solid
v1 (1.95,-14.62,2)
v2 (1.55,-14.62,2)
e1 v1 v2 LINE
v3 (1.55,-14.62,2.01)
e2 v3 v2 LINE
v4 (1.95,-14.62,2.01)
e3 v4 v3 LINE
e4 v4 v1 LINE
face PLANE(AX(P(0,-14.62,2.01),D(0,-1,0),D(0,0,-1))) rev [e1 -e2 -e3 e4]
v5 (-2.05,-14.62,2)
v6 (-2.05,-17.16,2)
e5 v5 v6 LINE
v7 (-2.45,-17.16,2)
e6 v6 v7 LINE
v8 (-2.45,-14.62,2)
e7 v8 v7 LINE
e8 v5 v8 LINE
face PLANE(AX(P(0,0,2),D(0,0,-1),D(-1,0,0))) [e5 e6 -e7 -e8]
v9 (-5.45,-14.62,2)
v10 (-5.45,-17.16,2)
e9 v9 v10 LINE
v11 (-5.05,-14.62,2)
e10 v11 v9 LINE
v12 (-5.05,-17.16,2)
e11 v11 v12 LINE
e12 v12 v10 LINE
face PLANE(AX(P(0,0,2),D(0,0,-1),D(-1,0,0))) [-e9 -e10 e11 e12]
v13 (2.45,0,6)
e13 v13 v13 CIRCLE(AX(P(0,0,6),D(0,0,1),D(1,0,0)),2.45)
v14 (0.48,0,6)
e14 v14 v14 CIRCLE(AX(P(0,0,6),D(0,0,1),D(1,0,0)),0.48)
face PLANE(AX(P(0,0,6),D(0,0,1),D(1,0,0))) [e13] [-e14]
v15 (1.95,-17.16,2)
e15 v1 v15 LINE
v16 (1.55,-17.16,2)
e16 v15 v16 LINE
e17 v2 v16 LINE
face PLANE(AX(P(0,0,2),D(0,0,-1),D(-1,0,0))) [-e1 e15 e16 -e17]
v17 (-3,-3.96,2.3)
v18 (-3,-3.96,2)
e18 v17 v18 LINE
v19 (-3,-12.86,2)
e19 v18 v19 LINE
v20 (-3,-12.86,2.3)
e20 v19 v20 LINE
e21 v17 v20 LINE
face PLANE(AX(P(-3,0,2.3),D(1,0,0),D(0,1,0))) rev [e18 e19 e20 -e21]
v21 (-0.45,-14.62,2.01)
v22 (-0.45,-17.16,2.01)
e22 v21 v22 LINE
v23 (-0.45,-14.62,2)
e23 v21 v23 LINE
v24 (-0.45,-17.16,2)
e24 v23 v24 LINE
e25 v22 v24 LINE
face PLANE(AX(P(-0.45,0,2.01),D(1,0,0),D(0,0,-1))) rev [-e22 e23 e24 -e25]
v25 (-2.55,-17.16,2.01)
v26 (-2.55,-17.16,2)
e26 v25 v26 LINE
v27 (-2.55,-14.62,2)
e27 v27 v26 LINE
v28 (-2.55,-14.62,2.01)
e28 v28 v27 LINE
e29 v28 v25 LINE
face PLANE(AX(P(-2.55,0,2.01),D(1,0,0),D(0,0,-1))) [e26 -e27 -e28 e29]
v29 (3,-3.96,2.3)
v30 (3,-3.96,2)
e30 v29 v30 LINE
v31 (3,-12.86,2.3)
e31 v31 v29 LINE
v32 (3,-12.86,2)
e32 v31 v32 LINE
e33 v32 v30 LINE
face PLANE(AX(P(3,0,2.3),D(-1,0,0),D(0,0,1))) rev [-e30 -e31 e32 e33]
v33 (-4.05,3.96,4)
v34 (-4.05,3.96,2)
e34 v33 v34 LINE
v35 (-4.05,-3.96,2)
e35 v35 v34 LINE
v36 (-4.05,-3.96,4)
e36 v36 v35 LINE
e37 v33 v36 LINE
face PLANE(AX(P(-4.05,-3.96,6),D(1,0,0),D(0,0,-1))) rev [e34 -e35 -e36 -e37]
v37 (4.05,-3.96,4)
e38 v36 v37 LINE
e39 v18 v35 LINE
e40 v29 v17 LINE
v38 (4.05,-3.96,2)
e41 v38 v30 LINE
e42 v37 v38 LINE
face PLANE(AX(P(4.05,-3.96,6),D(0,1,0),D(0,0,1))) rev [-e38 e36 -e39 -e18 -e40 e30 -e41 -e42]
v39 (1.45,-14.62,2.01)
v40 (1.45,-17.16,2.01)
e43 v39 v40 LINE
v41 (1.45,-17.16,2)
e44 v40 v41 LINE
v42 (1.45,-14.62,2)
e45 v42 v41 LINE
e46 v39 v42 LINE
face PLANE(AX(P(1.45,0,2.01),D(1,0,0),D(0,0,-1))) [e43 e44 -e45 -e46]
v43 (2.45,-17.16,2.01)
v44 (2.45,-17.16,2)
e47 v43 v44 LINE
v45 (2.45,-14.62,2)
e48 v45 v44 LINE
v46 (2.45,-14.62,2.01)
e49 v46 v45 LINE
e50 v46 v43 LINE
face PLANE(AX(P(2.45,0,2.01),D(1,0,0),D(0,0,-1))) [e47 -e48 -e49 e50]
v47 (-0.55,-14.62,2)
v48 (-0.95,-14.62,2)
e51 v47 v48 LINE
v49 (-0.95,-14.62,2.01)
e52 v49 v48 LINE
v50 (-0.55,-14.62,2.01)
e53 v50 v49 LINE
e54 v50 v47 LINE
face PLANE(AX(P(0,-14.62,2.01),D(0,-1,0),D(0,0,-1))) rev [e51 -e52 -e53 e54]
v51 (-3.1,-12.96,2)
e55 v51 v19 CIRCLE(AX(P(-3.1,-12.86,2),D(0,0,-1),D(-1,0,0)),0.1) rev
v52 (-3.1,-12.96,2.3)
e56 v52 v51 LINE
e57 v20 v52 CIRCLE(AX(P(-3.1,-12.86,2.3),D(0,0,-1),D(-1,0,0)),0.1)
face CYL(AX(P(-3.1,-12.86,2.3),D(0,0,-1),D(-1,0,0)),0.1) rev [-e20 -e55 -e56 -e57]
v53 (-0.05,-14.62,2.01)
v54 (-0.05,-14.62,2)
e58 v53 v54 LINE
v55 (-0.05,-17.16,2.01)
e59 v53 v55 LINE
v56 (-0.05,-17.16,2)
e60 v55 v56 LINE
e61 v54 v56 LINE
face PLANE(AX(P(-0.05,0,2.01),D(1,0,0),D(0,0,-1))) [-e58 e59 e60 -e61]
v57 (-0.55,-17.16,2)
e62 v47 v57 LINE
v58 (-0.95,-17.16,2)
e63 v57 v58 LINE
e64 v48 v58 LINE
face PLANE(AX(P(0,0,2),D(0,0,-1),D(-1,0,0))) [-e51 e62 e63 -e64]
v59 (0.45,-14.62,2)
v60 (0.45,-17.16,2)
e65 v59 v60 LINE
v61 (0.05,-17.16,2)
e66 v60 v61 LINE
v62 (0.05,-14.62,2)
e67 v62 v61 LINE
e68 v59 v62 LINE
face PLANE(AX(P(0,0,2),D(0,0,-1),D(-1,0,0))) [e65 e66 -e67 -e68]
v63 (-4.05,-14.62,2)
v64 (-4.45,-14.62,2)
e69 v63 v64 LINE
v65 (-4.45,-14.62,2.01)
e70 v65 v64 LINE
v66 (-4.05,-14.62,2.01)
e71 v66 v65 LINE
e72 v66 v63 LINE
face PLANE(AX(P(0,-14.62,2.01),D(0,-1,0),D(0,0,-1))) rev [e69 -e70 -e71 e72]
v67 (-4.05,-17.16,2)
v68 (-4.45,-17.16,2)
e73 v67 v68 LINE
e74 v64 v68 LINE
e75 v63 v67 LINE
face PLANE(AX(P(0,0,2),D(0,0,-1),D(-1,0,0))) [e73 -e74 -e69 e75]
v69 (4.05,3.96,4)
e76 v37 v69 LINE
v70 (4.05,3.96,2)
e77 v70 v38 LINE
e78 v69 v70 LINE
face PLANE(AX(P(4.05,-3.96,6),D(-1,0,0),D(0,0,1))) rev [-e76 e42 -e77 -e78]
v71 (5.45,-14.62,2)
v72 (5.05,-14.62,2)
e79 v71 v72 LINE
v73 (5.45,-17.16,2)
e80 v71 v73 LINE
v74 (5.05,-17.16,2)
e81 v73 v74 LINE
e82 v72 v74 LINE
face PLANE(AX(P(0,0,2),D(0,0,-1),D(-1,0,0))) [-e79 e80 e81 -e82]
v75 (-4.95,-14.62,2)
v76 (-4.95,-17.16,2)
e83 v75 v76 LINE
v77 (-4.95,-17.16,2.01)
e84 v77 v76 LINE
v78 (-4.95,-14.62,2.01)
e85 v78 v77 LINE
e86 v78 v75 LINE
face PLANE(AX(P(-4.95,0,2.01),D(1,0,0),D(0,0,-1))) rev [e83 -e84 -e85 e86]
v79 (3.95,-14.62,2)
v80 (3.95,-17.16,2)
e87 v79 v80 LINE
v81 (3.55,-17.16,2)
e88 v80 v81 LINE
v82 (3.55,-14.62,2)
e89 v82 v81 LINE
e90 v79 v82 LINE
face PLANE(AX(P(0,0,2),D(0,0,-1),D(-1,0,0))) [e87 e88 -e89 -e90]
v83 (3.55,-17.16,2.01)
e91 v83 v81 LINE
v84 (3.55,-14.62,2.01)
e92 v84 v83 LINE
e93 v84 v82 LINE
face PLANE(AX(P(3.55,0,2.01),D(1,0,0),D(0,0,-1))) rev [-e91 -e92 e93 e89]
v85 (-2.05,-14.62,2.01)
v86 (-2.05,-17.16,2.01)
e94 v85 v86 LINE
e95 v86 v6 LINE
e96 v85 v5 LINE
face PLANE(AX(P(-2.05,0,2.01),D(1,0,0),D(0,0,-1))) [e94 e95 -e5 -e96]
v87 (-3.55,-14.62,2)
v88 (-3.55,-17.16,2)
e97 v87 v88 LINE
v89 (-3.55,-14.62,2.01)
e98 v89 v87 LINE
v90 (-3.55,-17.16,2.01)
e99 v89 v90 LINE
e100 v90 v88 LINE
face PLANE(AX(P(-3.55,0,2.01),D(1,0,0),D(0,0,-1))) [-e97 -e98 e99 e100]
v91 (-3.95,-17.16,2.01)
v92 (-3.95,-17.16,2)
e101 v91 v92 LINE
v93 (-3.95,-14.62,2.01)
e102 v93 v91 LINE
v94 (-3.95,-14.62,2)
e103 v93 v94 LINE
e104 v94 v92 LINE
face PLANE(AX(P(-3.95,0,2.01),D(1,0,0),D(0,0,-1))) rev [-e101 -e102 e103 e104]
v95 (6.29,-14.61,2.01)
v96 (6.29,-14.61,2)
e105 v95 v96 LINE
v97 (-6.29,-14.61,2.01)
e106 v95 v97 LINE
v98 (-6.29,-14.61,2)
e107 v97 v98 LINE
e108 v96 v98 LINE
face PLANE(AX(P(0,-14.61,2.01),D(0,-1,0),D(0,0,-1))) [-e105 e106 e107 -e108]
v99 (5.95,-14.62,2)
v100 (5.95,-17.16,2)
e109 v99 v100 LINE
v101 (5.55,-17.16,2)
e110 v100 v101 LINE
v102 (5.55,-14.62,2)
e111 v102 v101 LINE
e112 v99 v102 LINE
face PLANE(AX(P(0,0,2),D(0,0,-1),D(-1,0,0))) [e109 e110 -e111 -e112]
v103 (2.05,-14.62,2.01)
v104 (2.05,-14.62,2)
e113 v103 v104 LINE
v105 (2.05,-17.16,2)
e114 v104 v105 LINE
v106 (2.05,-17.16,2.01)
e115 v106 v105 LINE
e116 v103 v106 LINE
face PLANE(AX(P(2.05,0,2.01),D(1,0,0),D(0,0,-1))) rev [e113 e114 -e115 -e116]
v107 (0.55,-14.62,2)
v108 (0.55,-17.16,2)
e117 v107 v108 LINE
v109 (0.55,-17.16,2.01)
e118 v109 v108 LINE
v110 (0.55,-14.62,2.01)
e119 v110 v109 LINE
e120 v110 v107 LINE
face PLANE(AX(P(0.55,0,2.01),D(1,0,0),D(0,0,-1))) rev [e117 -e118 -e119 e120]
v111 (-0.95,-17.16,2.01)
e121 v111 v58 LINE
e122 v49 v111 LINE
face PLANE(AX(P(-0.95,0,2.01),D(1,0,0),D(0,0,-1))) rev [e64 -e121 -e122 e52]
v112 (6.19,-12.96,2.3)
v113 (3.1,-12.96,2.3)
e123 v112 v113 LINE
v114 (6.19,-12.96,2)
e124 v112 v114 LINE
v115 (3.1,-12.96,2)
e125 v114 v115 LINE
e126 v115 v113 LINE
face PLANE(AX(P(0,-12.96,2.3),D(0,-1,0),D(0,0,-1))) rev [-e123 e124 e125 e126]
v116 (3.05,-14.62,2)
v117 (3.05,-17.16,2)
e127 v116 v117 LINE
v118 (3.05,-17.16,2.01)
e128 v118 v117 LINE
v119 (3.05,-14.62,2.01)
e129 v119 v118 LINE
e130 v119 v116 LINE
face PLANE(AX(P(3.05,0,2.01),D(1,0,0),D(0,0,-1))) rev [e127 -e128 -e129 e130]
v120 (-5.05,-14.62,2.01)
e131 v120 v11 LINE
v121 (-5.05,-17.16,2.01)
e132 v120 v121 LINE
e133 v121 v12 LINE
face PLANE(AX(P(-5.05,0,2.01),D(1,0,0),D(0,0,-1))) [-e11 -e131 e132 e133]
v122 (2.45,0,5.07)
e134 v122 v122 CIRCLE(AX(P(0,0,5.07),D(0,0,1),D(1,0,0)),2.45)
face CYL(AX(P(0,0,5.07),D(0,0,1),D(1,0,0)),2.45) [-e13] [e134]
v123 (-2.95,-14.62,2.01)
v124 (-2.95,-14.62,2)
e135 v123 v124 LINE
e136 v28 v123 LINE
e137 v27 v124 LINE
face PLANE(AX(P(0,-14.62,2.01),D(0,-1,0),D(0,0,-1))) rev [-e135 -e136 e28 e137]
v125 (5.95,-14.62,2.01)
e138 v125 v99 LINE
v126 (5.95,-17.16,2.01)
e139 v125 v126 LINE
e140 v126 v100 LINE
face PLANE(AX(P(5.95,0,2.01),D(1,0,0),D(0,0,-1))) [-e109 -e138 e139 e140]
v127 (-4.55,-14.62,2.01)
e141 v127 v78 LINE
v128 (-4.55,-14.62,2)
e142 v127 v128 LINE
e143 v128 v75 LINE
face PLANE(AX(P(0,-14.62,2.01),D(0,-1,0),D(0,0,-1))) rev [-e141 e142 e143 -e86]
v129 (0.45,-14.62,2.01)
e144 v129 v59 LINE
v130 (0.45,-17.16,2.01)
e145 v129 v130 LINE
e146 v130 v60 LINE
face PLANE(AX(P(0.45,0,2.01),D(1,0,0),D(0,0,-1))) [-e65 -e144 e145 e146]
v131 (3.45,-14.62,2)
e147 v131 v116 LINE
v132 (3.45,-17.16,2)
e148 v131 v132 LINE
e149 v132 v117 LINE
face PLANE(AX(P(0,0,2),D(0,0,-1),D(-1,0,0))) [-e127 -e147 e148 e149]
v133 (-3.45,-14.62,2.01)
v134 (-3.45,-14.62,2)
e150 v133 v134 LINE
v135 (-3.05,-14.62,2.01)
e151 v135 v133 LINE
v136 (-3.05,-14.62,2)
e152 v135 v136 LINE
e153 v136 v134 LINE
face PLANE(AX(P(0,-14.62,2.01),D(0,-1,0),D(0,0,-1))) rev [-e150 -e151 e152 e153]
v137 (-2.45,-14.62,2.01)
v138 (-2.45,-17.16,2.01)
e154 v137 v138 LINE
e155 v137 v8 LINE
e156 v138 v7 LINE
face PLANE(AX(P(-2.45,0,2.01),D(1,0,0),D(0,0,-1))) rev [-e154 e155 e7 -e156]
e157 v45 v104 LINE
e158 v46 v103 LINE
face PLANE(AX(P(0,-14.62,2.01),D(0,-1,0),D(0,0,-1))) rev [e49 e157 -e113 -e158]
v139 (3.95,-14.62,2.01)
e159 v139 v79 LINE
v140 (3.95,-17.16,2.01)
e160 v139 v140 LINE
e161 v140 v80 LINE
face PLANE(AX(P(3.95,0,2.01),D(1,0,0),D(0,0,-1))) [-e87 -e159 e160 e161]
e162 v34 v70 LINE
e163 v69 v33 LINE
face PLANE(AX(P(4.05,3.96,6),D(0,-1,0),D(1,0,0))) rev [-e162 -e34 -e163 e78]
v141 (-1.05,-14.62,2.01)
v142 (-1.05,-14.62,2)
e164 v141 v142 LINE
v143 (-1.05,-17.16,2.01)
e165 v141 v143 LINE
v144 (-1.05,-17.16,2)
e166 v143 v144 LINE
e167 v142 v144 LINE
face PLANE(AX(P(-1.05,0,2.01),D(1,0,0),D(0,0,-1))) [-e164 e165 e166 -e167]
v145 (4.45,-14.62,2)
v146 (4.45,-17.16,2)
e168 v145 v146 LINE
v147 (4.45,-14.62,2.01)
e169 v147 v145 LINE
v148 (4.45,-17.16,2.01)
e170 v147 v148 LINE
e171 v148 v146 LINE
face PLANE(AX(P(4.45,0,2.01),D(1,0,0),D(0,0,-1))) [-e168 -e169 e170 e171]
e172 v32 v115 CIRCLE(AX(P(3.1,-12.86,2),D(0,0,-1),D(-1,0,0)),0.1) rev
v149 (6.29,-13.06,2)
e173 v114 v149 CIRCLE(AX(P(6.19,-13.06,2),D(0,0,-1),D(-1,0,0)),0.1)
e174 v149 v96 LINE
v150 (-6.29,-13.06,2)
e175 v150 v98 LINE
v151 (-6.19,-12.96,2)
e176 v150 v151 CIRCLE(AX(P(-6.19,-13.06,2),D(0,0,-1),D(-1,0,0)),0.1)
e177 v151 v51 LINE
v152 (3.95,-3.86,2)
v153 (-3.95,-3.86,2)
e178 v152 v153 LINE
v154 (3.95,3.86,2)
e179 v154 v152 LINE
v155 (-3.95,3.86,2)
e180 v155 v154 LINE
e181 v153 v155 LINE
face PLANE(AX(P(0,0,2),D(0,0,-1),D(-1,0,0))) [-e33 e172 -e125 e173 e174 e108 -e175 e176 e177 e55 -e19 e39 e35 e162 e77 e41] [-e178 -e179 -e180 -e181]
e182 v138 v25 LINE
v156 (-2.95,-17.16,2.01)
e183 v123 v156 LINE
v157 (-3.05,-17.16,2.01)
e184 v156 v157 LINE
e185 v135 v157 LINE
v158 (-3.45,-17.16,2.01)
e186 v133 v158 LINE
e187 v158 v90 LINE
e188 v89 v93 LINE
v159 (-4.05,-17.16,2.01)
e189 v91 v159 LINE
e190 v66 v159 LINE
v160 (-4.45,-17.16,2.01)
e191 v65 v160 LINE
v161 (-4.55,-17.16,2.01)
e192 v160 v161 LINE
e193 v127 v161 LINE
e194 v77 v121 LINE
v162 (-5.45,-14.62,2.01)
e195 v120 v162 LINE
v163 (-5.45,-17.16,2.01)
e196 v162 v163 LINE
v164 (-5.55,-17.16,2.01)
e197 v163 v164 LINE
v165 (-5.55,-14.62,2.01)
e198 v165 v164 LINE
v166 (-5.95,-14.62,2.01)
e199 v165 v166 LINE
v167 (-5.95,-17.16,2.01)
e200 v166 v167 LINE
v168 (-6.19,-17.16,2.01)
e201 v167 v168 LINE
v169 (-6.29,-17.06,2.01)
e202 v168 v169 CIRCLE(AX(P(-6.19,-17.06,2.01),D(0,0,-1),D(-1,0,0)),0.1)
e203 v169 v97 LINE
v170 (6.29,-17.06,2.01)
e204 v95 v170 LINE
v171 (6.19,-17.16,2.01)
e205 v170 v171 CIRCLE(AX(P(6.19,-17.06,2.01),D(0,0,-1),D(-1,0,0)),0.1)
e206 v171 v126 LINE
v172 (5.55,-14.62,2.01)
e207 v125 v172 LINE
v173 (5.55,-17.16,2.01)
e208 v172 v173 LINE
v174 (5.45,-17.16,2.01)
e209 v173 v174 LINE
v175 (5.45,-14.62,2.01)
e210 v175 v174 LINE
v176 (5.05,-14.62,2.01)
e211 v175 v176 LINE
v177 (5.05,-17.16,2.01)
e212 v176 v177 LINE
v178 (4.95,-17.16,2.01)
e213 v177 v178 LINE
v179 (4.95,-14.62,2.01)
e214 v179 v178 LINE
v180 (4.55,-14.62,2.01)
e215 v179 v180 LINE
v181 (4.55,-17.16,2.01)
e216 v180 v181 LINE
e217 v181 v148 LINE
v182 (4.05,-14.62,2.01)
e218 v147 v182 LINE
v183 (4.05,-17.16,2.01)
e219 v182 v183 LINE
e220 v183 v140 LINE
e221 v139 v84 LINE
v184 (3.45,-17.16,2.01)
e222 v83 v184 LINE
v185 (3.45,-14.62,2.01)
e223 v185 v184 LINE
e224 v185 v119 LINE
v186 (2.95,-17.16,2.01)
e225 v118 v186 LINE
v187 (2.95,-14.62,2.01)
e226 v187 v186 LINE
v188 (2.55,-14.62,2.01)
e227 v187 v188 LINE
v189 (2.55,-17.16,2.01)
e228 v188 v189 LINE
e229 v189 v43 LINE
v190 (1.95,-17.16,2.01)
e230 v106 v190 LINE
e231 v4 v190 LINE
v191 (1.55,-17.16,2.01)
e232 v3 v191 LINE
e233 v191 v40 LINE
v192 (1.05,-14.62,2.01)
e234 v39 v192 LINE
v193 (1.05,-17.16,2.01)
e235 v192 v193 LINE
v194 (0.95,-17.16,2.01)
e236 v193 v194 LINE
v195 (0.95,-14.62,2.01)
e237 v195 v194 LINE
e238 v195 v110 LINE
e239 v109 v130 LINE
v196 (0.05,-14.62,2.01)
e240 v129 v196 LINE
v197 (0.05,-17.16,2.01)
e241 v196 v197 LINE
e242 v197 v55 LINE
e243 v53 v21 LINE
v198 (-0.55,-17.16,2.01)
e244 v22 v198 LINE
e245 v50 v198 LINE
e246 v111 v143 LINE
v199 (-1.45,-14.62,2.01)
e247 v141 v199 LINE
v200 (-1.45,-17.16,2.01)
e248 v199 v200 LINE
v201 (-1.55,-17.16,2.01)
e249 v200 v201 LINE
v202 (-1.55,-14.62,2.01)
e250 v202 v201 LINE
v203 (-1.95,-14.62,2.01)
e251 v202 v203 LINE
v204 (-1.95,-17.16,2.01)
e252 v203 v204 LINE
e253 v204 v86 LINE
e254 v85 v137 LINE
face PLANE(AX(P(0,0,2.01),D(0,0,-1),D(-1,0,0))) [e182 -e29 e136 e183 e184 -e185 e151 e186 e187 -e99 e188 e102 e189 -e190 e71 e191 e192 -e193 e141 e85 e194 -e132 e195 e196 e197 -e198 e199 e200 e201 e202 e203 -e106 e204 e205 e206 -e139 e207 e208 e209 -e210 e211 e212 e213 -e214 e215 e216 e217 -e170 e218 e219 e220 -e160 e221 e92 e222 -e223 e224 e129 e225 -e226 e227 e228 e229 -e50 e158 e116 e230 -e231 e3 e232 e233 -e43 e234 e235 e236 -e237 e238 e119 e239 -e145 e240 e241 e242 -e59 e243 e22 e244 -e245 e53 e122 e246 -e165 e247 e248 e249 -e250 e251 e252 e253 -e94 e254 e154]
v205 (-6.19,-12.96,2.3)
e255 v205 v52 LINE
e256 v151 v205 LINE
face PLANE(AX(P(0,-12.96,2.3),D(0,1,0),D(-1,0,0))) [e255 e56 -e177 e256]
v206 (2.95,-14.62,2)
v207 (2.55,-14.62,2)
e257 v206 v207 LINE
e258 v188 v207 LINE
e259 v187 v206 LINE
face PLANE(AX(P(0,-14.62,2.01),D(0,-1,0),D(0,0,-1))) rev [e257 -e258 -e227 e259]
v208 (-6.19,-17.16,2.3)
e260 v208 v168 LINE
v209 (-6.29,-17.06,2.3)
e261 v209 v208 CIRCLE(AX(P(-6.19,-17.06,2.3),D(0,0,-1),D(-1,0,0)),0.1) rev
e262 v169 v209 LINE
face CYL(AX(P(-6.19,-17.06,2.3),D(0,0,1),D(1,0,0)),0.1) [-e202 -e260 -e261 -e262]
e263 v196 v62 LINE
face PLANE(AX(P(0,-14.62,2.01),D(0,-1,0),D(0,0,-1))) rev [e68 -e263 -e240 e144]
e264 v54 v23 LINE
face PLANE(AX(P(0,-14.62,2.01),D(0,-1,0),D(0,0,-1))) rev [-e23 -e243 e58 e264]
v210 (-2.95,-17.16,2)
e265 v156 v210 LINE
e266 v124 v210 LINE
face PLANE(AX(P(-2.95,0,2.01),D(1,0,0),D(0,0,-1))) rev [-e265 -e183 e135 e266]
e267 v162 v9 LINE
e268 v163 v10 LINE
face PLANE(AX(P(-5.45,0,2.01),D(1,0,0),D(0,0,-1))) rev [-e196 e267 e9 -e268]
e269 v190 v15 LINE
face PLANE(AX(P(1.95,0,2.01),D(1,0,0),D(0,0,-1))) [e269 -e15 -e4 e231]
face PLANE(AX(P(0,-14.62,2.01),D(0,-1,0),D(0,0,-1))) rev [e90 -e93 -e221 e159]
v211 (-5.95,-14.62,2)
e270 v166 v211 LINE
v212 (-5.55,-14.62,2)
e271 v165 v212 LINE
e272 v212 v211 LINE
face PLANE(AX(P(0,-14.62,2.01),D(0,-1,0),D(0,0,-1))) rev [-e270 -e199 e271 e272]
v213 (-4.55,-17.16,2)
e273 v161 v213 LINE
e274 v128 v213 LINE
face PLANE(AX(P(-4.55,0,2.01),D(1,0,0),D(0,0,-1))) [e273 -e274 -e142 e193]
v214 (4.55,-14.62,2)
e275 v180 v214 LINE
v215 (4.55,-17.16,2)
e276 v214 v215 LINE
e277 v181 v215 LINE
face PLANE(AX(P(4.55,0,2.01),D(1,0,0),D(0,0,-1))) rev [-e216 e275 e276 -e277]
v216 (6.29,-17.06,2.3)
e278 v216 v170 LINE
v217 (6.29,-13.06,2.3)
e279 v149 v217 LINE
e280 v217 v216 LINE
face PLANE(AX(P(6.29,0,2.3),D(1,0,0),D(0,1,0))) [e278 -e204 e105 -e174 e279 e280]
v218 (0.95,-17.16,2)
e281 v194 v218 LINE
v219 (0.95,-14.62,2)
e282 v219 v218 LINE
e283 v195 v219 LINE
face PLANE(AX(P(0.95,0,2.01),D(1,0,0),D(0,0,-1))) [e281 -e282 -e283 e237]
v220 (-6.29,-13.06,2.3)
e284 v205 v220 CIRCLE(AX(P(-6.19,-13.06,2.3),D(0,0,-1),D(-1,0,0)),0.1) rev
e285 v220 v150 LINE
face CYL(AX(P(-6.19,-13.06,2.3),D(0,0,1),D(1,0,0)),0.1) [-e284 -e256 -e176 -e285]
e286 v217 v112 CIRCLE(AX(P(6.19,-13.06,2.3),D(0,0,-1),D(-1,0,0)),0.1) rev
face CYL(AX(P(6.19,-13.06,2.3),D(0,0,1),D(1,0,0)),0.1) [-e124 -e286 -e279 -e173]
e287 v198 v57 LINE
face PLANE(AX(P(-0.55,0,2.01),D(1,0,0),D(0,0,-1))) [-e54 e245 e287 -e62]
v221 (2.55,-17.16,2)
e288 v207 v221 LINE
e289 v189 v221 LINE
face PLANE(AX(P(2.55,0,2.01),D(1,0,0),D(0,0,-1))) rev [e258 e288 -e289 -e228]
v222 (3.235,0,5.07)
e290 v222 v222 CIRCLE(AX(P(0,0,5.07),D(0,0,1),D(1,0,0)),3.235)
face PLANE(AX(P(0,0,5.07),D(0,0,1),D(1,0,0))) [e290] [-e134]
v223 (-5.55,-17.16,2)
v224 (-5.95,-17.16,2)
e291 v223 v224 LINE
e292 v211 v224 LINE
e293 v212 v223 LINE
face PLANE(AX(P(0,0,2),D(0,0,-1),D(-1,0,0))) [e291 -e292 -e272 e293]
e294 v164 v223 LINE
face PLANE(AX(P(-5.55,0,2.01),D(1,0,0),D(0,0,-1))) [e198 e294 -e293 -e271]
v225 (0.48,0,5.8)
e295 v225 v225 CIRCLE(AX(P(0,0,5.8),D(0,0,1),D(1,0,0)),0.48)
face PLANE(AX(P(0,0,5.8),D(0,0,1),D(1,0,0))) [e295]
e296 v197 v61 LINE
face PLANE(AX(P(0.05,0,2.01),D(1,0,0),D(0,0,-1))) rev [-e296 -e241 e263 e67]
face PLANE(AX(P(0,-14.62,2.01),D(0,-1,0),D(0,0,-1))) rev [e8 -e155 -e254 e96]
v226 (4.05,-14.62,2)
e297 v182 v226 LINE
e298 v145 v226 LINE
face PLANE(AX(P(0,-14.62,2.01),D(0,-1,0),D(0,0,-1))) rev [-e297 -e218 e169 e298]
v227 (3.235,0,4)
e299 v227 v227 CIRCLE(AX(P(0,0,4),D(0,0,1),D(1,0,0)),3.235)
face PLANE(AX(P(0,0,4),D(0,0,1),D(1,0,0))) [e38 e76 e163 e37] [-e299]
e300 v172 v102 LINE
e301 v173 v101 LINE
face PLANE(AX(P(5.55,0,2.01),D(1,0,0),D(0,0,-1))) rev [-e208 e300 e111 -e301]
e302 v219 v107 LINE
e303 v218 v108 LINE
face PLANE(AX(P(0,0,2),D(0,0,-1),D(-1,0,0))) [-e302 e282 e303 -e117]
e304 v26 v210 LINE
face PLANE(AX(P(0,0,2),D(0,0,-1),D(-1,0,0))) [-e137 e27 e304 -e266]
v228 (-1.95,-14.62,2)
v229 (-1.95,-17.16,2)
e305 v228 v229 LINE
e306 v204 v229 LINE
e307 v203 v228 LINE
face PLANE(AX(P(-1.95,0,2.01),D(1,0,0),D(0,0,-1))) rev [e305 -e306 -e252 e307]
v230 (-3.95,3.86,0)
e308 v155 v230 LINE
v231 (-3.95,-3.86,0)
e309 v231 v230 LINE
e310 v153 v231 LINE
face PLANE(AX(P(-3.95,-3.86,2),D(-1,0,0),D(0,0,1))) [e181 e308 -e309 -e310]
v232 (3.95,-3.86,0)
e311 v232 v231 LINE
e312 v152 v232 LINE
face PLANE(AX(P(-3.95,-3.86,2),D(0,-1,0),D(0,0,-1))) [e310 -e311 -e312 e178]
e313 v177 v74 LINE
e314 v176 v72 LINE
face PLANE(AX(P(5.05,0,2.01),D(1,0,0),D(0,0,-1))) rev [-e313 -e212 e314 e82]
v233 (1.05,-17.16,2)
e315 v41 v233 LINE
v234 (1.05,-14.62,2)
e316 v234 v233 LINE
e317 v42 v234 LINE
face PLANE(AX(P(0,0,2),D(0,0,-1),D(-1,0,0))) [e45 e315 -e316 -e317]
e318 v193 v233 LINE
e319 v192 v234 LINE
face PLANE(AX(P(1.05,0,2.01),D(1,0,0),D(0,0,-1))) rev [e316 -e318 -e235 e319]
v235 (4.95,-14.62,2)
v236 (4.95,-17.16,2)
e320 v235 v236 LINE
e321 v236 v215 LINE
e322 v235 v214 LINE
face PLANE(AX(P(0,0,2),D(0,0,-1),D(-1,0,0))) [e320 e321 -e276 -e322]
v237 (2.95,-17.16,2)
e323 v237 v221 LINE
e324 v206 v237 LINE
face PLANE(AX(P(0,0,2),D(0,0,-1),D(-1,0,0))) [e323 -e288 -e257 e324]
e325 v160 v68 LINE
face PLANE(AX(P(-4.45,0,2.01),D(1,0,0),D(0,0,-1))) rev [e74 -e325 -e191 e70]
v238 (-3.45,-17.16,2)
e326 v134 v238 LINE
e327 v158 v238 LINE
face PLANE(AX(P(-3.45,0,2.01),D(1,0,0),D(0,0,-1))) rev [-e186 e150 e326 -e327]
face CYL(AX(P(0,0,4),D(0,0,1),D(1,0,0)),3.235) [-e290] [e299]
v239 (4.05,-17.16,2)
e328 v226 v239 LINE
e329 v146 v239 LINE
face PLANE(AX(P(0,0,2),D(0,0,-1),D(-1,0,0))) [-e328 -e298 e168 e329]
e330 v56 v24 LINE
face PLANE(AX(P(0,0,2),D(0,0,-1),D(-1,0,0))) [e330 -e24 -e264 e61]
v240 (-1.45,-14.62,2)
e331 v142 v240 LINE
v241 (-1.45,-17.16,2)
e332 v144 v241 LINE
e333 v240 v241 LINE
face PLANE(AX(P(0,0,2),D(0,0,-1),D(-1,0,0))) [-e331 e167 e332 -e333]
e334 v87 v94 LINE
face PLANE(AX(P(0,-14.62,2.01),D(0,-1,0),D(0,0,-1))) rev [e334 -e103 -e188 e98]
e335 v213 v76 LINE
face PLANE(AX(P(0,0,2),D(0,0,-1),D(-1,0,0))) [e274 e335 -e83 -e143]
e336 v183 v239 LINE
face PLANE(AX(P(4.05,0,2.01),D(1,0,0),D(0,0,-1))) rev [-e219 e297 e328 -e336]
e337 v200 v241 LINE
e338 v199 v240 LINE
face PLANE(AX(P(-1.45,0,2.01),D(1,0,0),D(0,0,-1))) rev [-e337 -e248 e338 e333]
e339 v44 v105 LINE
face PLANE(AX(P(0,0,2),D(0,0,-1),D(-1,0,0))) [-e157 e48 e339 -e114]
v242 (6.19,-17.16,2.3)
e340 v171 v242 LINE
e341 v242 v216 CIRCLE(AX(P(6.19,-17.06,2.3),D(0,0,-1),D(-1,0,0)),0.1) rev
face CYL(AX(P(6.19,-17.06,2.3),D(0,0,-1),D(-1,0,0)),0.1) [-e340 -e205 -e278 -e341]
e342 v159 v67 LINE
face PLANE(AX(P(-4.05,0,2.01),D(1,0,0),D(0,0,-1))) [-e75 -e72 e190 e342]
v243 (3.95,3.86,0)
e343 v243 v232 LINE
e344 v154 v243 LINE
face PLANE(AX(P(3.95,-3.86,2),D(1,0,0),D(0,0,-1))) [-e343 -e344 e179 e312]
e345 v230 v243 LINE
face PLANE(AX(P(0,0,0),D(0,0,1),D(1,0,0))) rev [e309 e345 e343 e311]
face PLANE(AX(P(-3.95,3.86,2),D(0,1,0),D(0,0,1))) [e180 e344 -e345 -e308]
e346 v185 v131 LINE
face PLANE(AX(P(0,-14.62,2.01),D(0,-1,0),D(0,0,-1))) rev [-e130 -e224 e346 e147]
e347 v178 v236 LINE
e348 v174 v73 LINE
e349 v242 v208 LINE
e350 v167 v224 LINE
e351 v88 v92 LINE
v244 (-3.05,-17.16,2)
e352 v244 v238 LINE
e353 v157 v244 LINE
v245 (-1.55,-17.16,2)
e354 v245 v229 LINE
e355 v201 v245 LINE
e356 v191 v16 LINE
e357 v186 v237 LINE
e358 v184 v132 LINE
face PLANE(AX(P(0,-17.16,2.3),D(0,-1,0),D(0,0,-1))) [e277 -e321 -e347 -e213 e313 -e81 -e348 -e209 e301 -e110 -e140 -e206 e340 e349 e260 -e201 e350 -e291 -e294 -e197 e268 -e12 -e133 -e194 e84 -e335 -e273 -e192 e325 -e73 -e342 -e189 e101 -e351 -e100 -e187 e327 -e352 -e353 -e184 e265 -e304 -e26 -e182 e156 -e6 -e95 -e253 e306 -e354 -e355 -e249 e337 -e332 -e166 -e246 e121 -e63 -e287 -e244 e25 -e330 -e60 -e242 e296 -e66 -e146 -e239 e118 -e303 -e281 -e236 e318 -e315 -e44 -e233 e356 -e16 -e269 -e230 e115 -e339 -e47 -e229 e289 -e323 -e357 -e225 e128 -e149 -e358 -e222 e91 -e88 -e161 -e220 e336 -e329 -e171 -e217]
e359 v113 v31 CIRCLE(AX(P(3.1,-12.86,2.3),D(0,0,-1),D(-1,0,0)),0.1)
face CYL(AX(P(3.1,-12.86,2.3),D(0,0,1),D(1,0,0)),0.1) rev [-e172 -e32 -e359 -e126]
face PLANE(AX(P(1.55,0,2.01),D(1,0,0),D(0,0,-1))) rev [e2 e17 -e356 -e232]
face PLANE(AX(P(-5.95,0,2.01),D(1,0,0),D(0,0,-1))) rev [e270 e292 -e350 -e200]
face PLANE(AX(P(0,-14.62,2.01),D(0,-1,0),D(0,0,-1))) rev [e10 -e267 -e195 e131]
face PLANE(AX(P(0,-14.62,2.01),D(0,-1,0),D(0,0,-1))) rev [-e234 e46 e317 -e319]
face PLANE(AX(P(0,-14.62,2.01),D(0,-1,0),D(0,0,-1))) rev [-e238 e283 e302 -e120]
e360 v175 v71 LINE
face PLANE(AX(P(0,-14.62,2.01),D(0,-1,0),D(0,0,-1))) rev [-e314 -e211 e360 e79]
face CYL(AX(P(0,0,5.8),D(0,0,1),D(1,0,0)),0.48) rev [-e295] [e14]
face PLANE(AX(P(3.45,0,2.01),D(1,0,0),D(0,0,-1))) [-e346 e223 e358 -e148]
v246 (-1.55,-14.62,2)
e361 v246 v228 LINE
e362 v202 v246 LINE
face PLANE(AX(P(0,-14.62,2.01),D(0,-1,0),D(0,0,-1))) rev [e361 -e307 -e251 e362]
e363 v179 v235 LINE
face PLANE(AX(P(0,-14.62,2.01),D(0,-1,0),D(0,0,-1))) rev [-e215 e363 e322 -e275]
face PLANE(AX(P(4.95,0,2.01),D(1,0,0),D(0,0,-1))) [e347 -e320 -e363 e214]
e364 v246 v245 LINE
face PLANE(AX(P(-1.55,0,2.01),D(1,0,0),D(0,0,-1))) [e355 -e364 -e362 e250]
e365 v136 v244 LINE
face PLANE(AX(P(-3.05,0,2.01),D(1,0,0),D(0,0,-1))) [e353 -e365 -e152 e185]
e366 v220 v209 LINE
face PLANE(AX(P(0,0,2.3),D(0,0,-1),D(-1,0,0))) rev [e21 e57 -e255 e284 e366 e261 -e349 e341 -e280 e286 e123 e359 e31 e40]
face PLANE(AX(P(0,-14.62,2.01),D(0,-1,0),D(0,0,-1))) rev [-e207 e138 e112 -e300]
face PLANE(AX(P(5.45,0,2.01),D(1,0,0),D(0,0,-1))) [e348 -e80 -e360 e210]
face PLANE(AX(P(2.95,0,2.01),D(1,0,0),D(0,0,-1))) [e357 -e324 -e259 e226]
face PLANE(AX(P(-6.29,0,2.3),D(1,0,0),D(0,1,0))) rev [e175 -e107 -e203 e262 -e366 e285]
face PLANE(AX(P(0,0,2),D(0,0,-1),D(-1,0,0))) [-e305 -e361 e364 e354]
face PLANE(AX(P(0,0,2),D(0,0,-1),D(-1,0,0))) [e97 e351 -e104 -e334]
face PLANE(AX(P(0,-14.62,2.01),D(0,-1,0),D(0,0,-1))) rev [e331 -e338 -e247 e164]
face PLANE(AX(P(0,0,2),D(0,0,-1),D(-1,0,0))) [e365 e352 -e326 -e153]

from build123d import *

# Parameters (mm, degrees)
SKETCH1_W           = 8.1
SKETCH1_H           = 7.92
BOSS_EXTRUDE1_DEPTH = 6
SKETCH2_W           = 8.1
SKETCH2_H           = 7.92
SKETCH2_R           = 3.235
CUT_EXTRUDE1_DEPTH  = 2
SKETCH3_R           = 3.235
SKETCH3_R_2         = 2.45
CUT_EXTRUDE2_DEPTH  = 0.93
SKETCH4_R           = 0.48
CUT_EXTRUDE3_DEPTH  = 0.2
SKETCH5_W           = 8.1
SKETCH5_H           = 7.92
SKETCH5_W_2         = 7.9
SKETCH5_H_2         = 7.72
CUT_EXTRUDE4_DEPTH  = 2
BOSS_EXTRUDE2_DEPTH = 0.3
CUT_EXTRUDE5_DEPTH  = 0.01
FILLET1_R           = 0.1


with BuildPart() as part:
    # Sketch1 → Boss-Extrude1 (new body)
    with BuildSketch(Plane.XY):
        Rectangle(SKETCH1_W, SKETCH1_H)
    extrude(amount=BOSS_EXTRUDE1_DEPTH)

    # Sketch2 → Cut-Extrude1 (cut)
    with BuildSketch(Plane.XY.offset(6)):
        Rectangle(SKETCH2_W, SKETCH2_H)
        Circle(SKETCH2_R, mode=Mode.SUBTRACT)
    extrude(amount=-CUT_EXTRUDE1_DEPTH, mode=Mode.SUBTRACT)

    # Sketch3 → Cut-Extrude2 (cut)
    with BuildSketch(Plane.XY.offset(6)):
        Circle(SKETCH3_R)
        Circle(SKETCH3_R_2, mode=Mode.SUBTRACT)
    extrude(amount=-CUT_EXTRUDE2_DEPTH, mode=Mode.SUBTRACT)

    # Sketch4 → Cut-Extrude3 (cut)
    with BuildSketch(Plane.XY.offset(6)):
        Circle(SKETCH4_R)
    extrude(amount=-CUT_EXTRUDE3_DEPTH, mode=Mode.SUBTRACT)

    # Sketch5 → Cut-Extrude4 (cut)
    with BuildSketch(Plane(origin=(0, 0, 0), x_dir=(-1, 0, 0), z_dir=(0, 0, -1))):
        Rectangle(SKETCH5_W, SKETCH5_H)
        Rectangle(SKETCH5_W_2, SKETCH5_H_2, mode=Mode.SUBTRACT)
    extrude(amount=-CUT_EXTRUDE4_DEPTH, mode=Mode.SUBTRACT)

    # Sketch6 → Boss-Extrude2 (add)
    with BuildSketch(Plane(origin=(0, 0, 2), x_dir=(-1, 0, 0), z_dir=(0, 0, -1))):
        Polygon((-3, -17.16), (3, -17.16), (6.29, -17.16), (6.29, -12.96), (3, -12.96), (3, -3.96), (-3, -3.96), (-3, -12.96), (-6.29, -12.96), (-6.29, -17.16), align=None)
    extrude(amount=-BOSS_EXTRUDE2_DEPTH)

    # Sketch7 → Cut-Extrude5 (cut)
    with BuildSketch(Plane(origin=(0, 0, 2), x_dir=(-1, 0, 0), z_dir=(0, 0, -1))):
        Polygon((6.29, -14.61), (-6.29, -14.61), (-6.29, -17.16), (-5.95, -17.16), (-5.95, -14.62), (-5.55, -14.62), (-5.55, -17.16), (-5.45, -17.16), (-5.45, -14.62), (-5.05, -14.62), (-5.05, -17.16), (-4.95, -17.16), (-4.95, -14.62), (-4.55, -14.62), (-4.55, -17.16), (-4.45, -17.16), (-4.45, -14.62), (-4.05, -14.62), (-4.05, -17.16), (-3.95, -17.16), (-3.95, -14.62), (-3.55, -14.62), (-3.55, -17.16), (-3.45, -17.16), (-3.45, -14.62), (-3.05, -14.62), (-3.05, -17.16), (-2.95, -17.16), (-2.95, -14.62), (-2.55, -14.62), (-2.55, -17.16), (-2.45, -17.16), (-2.45, -14.62), (-2.05, -14.62), (-2.05, -17.16), (-1.95, -17.16), (-1.95, -14.62), (-1.55, -14.62), (-1.55, -17.16), (-1.45, -17.16), (-1.45, -14.62), (-1.05, -14.62), (-1.05, -17.16), (-0.95, -17.16), (-0.95, -14.62), (-0.55, -14.62), (-0.55, -17.16), (-0.45, -17.16), (-0.45, -14.62), (-0.05, -14.62), (-0.05, -17.16), (0.05, -17.16), (0.05, -14.62), (0.45, -14.62), (0.45, -17.16), (0.55, -17.16), (0.55, -14.62), (0.95, -14.62), (0.95, -17.16), (1.05, -17.16), (1.05, -14.62), (1.45, -14.62), (1.45, -17.16), (1.55, -17.16), (1.55, -14.62), (1.95, -14.62), (1.95, -17.16), (2.05, -17.16), (2.05, -14.62), (2.45, -14.62), (2.45, -17.16), (2.55, -17.16), (2.55, -14.62), (2.95, -14.62), (2.95, -17.16), (3.05, -17.16), (3.05, -14.62), (3.45, -14.62), (3.45, -17.16), (3.55, -17.16), (3.55, -14.62), (3.95, -14.62), (3.95, -17.16), (4.05, -17.16), (4.05, -14.62), (4.45, -14.62), (4.45, -17.16), (4.55, -17.16), (4.55, -14.62), (4.95, -14.62), (4.95, -17.16), (5.05, -17.16), (5.05, -14.62), (5.45, -14.62), (5.45, -17.16), (5.55, -17.16), (5.55, -14.62), (5.95, -14.62), (5.95, -17.16), (6.29, -17.16), align=None)
    extrude(amount=-CUT_EXTRUDE5_DEPTH, mode=Mode.SUBTRACT)

    # Fillet1
    fillet1_edges = [part.edges().sort_by_distance(p)[0] for p in [
        (-6.29, -17.16, 2.155),
        (6.29, -17.16, 2.155),
        (3, -12.96, 2.15),
        (-3, -12.96, 2.15),
        (-6.29, -12.96, 2.15),
        (6.29, -12.96, 2.15),
    ]]
    fillet(fillet1_edges, radius=FILLET1_R)


solid = part.part
